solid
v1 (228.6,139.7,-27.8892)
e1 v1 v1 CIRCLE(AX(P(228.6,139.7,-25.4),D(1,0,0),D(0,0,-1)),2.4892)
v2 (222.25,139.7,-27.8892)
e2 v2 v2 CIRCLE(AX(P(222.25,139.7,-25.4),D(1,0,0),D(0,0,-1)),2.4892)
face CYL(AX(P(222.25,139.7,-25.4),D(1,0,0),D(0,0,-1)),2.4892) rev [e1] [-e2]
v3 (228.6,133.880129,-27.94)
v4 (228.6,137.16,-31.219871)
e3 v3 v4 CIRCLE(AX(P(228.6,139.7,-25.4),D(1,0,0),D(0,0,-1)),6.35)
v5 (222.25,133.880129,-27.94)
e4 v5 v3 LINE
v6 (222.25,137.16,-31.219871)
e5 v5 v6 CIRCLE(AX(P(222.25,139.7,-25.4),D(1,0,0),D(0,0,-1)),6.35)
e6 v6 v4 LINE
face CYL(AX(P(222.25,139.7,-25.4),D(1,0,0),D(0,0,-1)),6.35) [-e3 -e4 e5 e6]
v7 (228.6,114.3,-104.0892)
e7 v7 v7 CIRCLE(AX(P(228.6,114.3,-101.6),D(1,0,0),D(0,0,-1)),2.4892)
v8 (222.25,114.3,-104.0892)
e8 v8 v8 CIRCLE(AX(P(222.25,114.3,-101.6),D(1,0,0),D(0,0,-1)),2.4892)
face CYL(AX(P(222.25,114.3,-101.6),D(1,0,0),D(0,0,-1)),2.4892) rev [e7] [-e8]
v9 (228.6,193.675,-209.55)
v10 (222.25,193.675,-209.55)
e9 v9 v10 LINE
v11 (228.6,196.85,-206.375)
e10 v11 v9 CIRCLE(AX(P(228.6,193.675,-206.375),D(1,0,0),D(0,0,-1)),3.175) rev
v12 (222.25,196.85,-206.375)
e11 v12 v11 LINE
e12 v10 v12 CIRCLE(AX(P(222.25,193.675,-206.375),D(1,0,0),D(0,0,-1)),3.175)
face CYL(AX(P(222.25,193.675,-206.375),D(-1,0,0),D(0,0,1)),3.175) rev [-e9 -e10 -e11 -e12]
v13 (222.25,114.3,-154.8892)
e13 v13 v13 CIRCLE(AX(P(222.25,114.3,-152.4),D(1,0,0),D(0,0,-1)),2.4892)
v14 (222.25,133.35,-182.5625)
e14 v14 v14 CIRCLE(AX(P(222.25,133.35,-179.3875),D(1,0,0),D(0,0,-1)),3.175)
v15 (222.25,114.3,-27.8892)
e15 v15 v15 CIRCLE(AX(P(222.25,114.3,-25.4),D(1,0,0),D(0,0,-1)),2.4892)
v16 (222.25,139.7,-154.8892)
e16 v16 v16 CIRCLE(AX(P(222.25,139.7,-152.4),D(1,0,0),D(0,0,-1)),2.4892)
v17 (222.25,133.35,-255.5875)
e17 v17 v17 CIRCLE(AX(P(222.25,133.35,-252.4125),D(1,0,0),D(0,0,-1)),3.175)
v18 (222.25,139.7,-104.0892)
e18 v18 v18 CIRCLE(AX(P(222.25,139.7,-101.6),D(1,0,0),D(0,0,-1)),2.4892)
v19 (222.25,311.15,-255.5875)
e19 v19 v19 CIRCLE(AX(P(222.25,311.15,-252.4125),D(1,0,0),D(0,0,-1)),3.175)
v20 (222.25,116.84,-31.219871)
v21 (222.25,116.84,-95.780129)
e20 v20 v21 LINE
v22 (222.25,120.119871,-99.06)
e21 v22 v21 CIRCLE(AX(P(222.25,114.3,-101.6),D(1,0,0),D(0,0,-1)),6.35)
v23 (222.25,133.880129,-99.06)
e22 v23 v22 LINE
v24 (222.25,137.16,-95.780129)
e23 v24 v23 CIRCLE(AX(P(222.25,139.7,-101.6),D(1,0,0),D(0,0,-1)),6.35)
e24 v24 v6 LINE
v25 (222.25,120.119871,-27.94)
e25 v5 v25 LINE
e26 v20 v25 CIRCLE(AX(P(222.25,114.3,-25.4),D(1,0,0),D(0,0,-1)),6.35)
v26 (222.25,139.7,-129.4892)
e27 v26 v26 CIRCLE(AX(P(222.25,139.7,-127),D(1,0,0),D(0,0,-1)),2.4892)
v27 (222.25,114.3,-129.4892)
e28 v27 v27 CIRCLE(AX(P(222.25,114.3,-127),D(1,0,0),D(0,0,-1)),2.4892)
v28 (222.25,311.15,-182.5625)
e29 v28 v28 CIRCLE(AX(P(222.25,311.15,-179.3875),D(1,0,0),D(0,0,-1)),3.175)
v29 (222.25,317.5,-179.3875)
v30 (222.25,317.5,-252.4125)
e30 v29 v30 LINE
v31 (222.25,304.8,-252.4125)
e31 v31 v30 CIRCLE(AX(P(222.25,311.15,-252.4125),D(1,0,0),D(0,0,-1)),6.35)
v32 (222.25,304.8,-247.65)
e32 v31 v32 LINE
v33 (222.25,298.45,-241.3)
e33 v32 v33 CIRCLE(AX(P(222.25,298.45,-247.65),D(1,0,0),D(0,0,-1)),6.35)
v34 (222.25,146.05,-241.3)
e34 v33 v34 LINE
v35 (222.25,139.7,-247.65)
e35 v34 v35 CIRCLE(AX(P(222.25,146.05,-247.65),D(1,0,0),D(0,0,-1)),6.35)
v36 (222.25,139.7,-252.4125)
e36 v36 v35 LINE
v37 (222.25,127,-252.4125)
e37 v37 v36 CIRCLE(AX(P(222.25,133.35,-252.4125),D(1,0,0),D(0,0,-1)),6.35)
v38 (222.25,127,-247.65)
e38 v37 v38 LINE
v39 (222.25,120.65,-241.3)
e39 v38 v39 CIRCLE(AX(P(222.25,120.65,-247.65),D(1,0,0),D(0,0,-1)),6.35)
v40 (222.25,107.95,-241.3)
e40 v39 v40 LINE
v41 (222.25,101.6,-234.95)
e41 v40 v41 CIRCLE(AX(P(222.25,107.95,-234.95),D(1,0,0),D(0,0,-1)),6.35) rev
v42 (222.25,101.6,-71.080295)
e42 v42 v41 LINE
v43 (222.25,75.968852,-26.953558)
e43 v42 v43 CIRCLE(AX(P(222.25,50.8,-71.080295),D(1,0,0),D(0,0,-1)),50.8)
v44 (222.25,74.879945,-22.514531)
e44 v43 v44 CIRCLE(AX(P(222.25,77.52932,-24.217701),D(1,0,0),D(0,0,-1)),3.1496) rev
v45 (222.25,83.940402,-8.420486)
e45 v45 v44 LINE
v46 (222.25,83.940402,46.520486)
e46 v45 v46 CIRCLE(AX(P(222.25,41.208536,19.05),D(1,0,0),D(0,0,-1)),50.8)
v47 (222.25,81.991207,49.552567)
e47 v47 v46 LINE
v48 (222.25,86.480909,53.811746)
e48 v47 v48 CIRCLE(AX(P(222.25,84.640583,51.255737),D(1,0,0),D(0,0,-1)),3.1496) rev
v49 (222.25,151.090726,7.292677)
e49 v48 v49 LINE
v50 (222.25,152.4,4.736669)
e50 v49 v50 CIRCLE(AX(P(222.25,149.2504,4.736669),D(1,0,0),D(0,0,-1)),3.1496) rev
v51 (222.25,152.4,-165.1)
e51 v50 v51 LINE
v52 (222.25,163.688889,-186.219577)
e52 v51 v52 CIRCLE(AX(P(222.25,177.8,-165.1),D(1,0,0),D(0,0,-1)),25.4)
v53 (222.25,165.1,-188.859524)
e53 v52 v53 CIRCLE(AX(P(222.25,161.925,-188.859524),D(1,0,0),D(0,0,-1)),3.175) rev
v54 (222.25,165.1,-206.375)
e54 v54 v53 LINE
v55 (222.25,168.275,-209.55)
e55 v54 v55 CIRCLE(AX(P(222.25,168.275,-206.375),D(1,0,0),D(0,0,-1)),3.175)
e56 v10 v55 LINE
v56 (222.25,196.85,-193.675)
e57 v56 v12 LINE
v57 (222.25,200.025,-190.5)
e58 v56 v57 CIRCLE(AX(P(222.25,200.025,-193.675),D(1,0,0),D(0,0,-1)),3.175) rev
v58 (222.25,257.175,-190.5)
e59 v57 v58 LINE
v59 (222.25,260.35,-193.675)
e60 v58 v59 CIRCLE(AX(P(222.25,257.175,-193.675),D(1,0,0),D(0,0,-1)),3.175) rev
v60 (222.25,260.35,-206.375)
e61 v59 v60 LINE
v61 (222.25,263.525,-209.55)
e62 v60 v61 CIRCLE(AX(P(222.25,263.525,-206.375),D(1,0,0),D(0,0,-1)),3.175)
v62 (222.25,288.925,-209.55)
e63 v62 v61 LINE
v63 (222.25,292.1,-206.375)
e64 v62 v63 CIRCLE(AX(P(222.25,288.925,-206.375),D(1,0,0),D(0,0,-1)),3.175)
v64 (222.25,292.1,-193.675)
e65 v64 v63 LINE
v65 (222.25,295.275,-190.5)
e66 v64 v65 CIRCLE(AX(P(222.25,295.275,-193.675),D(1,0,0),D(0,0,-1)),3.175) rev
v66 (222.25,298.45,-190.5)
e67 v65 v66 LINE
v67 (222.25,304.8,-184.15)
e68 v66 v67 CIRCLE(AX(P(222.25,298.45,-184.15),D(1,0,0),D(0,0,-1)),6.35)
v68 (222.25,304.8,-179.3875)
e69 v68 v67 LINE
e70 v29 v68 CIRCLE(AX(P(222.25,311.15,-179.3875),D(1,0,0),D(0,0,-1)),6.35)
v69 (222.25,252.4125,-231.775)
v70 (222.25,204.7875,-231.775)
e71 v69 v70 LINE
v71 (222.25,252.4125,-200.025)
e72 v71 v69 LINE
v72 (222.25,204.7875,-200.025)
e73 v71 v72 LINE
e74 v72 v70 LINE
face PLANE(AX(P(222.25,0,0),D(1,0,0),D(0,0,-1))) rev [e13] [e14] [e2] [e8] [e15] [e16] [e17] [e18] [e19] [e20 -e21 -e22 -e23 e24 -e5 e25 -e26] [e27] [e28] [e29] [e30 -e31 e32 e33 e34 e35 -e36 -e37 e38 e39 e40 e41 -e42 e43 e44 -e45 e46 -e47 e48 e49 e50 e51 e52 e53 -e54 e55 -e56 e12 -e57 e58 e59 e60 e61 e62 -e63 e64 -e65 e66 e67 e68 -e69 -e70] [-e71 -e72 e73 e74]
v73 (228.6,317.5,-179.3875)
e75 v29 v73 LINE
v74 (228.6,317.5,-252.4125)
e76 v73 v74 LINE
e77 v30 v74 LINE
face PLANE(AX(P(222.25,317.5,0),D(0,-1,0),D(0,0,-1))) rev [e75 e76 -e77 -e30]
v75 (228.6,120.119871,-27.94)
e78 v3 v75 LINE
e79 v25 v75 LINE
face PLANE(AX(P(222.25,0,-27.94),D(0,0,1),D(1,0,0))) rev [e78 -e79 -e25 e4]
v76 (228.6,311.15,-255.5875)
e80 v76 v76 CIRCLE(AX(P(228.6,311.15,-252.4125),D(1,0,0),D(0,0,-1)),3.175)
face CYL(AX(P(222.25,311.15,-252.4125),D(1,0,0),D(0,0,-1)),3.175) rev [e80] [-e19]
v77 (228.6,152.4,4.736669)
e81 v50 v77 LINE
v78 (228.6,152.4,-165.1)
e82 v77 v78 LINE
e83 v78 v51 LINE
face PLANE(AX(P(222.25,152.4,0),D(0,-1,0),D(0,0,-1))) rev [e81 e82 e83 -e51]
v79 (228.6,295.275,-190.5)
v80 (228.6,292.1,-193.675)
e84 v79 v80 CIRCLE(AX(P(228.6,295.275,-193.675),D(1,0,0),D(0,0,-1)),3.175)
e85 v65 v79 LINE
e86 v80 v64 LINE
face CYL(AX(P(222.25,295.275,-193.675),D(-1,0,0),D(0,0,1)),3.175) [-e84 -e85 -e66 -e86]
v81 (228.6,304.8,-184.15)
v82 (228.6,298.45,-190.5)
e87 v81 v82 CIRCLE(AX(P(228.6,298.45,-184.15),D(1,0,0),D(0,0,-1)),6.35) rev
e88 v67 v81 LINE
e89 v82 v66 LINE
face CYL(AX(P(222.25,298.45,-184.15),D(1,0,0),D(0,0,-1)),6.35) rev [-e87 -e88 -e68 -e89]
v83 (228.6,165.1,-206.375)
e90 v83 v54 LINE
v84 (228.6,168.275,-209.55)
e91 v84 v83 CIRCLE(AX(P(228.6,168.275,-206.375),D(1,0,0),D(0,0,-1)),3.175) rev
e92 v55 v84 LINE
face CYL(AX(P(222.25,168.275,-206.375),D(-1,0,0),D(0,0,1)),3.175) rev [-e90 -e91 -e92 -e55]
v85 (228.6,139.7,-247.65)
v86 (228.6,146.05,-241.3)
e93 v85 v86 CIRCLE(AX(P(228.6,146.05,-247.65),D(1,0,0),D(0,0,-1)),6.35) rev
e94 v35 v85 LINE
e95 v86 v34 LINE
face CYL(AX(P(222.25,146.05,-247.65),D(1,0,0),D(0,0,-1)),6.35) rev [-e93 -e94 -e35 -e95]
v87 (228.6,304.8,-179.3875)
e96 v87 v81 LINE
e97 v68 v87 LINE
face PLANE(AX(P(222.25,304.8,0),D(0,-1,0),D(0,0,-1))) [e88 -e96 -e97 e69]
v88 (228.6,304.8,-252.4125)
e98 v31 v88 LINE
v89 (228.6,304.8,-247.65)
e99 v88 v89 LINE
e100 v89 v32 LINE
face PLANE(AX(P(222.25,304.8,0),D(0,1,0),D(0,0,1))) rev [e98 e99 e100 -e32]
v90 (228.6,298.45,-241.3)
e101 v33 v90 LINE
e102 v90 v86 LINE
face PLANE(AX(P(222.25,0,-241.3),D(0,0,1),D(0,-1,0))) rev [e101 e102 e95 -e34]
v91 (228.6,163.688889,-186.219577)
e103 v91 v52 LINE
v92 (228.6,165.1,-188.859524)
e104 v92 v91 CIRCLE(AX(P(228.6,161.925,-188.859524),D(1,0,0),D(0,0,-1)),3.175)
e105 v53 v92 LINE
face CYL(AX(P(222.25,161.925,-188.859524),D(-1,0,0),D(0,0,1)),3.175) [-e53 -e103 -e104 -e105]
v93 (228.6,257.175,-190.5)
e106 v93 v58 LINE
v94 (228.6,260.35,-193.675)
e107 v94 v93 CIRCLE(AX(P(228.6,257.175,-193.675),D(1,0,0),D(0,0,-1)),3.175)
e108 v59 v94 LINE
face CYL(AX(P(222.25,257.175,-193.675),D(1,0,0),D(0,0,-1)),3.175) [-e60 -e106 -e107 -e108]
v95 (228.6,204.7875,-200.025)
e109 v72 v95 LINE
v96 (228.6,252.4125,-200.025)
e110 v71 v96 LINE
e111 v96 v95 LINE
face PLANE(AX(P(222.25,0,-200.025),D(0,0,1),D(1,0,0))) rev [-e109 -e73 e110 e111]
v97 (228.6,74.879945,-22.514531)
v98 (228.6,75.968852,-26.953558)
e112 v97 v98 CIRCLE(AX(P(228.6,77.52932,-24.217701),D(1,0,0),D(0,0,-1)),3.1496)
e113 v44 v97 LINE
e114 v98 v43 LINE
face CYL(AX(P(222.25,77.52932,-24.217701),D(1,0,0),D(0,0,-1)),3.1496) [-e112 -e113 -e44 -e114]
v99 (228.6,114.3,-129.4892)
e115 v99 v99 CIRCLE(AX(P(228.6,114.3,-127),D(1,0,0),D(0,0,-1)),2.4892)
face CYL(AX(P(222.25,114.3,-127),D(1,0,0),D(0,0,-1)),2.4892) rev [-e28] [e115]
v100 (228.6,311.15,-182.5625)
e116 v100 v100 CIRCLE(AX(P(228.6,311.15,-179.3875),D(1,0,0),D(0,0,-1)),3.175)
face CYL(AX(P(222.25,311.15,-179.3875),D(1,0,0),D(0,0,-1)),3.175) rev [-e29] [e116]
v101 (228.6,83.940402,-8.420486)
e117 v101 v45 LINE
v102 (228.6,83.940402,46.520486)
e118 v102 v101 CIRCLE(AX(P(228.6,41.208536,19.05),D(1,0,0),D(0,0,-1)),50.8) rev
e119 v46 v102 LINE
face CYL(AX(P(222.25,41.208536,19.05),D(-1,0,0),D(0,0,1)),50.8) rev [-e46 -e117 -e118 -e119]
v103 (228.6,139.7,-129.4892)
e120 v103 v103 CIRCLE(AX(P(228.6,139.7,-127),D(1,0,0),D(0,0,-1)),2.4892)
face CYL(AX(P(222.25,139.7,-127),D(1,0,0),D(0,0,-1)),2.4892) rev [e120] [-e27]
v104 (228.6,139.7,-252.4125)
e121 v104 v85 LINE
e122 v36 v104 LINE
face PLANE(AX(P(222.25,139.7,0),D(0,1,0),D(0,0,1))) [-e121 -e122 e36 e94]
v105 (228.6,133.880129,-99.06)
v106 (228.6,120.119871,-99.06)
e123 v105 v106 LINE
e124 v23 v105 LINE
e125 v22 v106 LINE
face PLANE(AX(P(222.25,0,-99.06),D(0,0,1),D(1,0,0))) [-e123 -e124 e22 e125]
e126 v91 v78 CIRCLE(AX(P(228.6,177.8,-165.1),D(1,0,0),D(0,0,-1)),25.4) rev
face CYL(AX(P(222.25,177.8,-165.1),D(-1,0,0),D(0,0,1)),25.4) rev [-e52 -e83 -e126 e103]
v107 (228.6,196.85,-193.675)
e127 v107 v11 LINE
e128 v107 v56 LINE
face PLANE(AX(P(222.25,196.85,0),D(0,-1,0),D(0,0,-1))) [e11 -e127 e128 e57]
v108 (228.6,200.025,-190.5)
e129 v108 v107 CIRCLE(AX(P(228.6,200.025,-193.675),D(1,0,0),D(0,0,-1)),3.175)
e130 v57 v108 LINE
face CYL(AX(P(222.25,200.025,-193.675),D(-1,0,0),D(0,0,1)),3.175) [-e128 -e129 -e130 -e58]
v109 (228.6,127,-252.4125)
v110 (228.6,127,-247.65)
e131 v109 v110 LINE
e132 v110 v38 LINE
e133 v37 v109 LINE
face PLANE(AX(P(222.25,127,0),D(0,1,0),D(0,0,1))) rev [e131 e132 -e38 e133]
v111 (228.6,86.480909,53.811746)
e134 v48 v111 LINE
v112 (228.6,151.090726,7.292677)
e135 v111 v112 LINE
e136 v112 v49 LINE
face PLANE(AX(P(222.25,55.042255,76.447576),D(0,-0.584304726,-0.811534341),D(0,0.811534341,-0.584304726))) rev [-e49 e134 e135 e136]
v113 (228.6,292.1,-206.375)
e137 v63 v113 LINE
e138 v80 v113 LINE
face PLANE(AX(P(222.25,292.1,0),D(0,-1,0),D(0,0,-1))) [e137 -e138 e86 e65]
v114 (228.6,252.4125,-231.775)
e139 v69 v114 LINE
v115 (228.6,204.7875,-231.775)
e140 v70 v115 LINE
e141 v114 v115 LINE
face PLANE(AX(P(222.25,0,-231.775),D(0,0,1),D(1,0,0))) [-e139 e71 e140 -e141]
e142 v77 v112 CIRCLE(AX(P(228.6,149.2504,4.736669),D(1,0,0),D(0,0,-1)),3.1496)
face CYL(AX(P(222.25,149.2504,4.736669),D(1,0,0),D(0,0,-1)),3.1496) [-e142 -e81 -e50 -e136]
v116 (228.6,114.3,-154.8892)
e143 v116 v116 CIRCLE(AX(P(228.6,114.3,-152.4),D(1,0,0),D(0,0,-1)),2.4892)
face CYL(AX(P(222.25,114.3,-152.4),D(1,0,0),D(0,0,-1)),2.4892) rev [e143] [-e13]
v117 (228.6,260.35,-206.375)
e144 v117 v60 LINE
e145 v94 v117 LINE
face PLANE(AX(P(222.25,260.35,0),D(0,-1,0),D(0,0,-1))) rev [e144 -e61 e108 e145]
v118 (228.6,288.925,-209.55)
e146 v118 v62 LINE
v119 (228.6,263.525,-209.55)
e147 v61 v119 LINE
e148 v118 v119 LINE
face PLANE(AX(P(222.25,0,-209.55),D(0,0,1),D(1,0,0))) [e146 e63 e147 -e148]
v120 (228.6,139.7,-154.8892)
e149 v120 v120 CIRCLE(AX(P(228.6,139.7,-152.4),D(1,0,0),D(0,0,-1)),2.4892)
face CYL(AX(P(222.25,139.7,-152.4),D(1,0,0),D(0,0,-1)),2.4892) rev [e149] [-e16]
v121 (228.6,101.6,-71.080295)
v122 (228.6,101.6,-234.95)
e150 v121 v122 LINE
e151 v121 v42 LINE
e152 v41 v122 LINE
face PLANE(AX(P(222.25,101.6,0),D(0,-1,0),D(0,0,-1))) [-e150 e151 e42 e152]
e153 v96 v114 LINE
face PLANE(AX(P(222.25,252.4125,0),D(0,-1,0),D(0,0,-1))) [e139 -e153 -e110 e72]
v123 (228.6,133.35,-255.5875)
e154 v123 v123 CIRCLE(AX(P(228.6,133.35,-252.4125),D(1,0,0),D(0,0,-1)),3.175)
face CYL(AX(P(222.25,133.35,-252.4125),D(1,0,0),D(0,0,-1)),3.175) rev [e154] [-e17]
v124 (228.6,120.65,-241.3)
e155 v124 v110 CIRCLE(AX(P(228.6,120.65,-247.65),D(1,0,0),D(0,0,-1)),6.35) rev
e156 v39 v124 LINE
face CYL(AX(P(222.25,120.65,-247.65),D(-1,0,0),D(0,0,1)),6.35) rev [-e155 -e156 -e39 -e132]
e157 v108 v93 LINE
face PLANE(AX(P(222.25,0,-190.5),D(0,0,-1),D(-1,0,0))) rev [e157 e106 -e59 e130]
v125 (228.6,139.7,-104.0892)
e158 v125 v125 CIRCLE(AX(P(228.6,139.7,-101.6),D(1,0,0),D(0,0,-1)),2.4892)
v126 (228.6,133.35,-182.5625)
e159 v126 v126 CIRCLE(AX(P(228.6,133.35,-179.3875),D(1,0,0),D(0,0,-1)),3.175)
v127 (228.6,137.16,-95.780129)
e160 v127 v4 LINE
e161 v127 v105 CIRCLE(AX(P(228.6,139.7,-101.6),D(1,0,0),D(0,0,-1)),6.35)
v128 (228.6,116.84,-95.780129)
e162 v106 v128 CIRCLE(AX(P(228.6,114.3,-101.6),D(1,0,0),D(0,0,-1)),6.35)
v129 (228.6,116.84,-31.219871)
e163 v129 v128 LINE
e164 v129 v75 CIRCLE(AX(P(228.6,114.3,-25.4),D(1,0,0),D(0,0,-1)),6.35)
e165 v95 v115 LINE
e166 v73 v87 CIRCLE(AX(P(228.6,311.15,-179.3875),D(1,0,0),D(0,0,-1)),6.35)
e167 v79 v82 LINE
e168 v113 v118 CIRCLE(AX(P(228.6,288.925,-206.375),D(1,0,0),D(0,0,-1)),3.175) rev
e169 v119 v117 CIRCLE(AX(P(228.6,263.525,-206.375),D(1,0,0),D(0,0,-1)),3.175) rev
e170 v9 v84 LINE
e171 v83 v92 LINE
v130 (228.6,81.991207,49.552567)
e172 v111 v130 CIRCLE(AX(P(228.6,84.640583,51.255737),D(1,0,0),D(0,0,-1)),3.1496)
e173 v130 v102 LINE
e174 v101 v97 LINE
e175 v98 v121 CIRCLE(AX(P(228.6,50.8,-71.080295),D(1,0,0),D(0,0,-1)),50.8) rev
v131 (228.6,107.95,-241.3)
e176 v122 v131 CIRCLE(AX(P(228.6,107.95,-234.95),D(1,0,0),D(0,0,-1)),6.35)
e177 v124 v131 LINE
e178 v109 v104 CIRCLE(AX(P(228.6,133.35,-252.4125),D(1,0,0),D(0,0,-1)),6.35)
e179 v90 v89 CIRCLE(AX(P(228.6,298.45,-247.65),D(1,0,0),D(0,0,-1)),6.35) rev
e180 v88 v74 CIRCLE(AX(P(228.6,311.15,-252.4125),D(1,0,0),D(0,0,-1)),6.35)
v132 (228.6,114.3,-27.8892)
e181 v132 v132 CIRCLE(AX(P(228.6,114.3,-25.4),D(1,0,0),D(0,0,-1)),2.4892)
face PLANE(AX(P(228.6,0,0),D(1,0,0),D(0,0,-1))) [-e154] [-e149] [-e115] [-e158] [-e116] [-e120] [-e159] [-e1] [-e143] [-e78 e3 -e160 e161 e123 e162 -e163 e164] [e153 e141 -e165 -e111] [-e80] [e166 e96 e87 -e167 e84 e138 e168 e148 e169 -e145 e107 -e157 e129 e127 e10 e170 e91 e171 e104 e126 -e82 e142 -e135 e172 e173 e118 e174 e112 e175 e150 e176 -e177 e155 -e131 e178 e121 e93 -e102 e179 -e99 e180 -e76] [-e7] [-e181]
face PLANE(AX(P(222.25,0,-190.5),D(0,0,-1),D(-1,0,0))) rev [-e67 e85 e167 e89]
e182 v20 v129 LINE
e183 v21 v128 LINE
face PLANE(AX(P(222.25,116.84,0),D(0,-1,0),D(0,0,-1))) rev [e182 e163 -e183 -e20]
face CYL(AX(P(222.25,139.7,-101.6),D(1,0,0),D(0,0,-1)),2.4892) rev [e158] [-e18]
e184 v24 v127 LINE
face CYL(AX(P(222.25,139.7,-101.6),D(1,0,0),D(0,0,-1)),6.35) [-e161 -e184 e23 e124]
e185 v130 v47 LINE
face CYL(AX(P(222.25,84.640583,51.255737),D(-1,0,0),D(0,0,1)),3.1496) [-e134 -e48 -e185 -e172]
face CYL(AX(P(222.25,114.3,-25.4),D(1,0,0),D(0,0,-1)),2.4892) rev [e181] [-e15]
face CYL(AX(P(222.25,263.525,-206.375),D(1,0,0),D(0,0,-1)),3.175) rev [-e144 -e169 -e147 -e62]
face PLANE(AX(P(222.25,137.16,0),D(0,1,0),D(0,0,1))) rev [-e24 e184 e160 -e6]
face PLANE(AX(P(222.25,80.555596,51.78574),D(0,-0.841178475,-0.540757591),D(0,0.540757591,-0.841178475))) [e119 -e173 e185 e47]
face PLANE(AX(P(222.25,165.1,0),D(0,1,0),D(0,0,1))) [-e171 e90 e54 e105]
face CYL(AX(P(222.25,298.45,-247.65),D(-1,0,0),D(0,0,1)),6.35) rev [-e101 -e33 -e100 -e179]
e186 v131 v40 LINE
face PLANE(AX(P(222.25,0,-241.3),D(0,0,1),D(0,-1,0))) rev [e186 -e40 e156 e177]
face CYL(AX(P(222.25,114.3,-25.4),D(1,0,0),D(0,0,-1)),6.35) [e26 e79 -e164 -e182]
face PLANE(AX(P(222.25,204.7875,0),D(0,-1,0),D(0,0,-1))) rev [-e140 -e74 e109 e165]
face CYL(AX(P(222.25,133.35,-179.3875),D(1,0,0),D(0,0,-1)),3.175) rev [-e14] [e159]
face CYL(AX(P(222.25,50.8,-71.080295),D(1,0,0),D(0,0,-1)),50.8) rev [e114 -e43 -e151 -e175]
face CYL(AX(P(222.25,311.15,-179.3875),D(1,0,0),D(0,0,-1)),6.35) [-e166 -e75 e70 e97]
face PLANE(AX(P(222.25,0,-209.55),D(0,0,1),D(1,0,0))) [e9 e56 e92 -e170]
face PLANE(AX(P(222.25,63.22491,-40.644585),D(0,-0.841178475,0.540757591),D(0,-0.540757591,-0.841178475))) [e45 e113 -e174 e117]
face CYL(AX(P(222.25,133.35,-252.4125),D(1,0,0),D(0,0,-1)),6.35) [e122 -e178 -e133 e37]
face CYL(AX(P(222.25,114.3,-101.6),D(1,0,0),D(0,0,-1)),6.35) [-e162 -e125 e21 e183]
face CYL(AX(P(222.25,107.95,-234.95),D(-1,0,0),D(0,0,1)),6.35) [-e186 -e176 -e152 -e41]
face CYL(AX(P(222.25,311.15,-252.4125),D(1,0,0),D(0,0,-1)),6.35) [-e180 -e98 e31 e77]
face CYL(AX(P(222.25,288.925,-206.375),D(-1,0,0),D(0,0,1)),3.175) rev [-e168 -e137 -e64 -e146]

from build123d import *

# Parameters (mm, degrees)
SKETCH2_R           = 2.4892
SKETCH2_R_2         = 3.175
SKETCH2_R_3         = 6.35
BOSS_EXTRUDE1_DEPTH = 6.35
FILLET1_R           = 25.4
FILLET2_R           = 6.35
FILLET3_R           = 12.7
SKETCH3_W           = 19.05
SKETCH3_H           = 31.75
CUT_EXTRUDE1_DEPTH  = 410.639602463
FILLET4_R           = 3.175
BOSS_EXTRUDE2_START = -6.35
BOSS_EXTRUDE2_DEPTH = 6.35
FILLET5_R           = 50.8
FILLET6_R           = 3.1496
SKETCH5_W           = 31.75
SKETCH5_H           = 47.625
CUT_EXTRUDE2_DEPTH  = 410.639602463


with BuildPart() as part:
    # Sketch2 → Boss-Extrude1 (new body)
    # profile 1 of 8: a face of its own
    with BuildSketch(Plane(origin=(228.6, 0, 0), x_dir=(0, 0, -1), z_dir=(1, 0, 0))):
        Polygon((190.5, 152.4), (12.7, 152.4), (12.7, 101.6), (241.3, 101.6), (241.3, 127), (241.3, 139.7), (241.3, 152.4), align=None)
        with Locations((25.4, 114.3)):
            Circle(SKETCH2_R, mode=Mode.SUBTRACT)
        with Locations((25.4, 139.7)):
            Circle(SKETCH2_R, mode=Mode.SUBTRACT)
        with Locations((101.6, 114.3)):
            Circle(SKETCH2_R, mode=Mode.SUBTRACT)
        with Locations((127, 114.3)):
            Circle(SKETCH2_R, mode=Mode.SUBTRACT)
        with Locations((101.6, 139.7)):
            Circle(SKETCH2_R, mode=Mode.SUBTRACT)
        with Locations((127, 139.7)):
            Circle(SKETCH2_R, mode=Mode.SUBTRACT)
        with Locations((152.4, 114.3)):
            Circle(SKETCH2_R, mode=Mode.SUBTRACT)
        with Locations((152.4, 139.7)):
            Circle(SKETCH2_R, mode=Mode.SUBTRACT)
        with Locations((179.3875, 133.35)):
            Circle(SKETCH2_R_2, mode=Mode.SUBTRACT)
    # profile 2 of 8: a face of its own
    with BuildSketch(Plane(origin=(228.6, 0, 0), x_dir=(0, 0, -1), z_dir=(1, 0, 0))):
        Polygon((190.5, 304.8), (190.5, 152.4), (241.3, 152.4), (241.3, 304.8), (241.3, 317.5), (190.5, 317.5), align=None)
    # profile 3 of 8: a face of its own
    with BuildSketch(Plane(origin=(228.6, 0, 0), x_dir=(0, 0, -1), z_dir=(1, 0, 0))):
        with BuildLine():
            Line((179.3875, 304.8), (190.5, 304.8))
            Line((190.5, 304.8), (190.5, 317.5))
            Line((190.5, 317.5), (179.3875, 317.5))
            ThreePointArc((179.3875, 317.5), (183.877628061, 315.640128061), (185.7375, 311.15))
            ThreePointArc((185.7375, 311.15), (183.877628061, 306.659871939), (179.3875, 304.8))
        make_face()
    # profile 4 of 8: a face of its own
    with BuildSketch(Plane(origin=(228.6, 0, 0), x_dir=(0, 0, -1), z_dir=(1, 0, 0))):
        with Locations((179.3875, 311.15)):
            Circle(SKETCH2_R_3)
        with Locations((179.3875, 311.15)):
            Circle(SKETCH2_R_2, mode=Mode.SUBTRACT)
    # profile 5 of 8: a face of its own
    with BuildSketch(Plane(origin=(228.6, 0, 0), x_dir=(0, 0, -1), z_dir=(1, 0, 0))):
        with Locations((252.4125, 311.15)):
            Circle(SKETCH2_R_3)
        with Locations((252.4125, 311.15)):
            Circle(SKETCH2_R_2, mode=Mode.SUBTRACT)
    # profile 6 of 8: a face of its own
    with BuildSketch(Plane(origin=(228.6, 0, 0), x_dir=(0, 0, -1), z_dir=(1, 0, 0))):
        with BuildLine():
            Line((241.3, 317.5), (241.3, 304.8))
            Line((241.3, 304.8), (252.4125, 304.8))
            ThreePointArc((252.4125, 304.8), (246.0625, 311.15), (252.4125, 317.5))
            Line((252.4125, 317.5), (241.3, 317.5))
        make_face()
    # profile 7 of 8: a face of its own
    with BuildSketch(Plane(origin=(228.6, 0, 0), x_dir=(0, 0, -1), z_dir=(1, 0, 0))):
        with BuildLine():
            Line((252.4125, 139.7), (241.3, 139.7))
            Line((241.3, 139.7), (241.3, 127))
            Line((241.3, 127), (252.4125, 127))
            ThreePointArc((252.4125, 127), (246.0625, 133.35), (252.4125, 139.7))
        make_face()
    # profile 8 of 8: a face of its own
    with BuildSketch(Plane(origin=(228.6, 0, 0), x_dir=(0, 0, -1), z_dir=(1, 0, 0))):
        with Locations((252.4125, 133.35)):
            Circle(SKETCH2_R_3)
        with Locations((252.4125, 133.35)):
            Circle(SKETCH2_R_2, mode=Mode.SUBTRACT)
    extrude(amount=-BOSS_EXTRUDE1_DEPTH)

    # Fillet1
    fillet1_edges = [part.edges().sort_by_distance(p)[0] for p in [
        (225.425, 152.4, -190.5),
    ]]
    fillet(fillet1_edges, radius=FILLET1_R)

    # Fillet2
    fillet2_edges = [part.edges().sort_by_distance(p)[0] for p in [
        (225.425, 139.7, -241.3),
        (225.425, 127, -241.3),
        (225.425, 101.6, -241.3),
        (225.425, 304.8, -190.5),
        (225.425, 304.8, -241.3),
    ]]
    fillet(fillet2_edges, radius=FILLET2_R)

    # Fillet3
    fillet3_edges = [part.edges().sort_by_distance(p)[0] for p in [
        (225.425, 101.6, -12.7),
        (225.425, 152.4, -12.7),
    ]]
    fillet(fillet3_edges, radius=FILLET3_R)

    # Sketch3 → Cut-Extrude1 (cut, through all)
    with BuildSketch(Plane(origin=(228.6, 0, 0), x_dir=(0, 0, -1), z_dir=(1, 0, 0))):
        with BuildLine():
            Line((190.5, 177.8), (190.5, 190.18276047))
            Line((190.5, 190.18276047), (98.023677914, 190.18276047))
            Line((98.023677914, 190.18276047), (98.023677914, 165.1))
            Line((98.023677914, 165.1), (187.097045256, 165.1))
            ThreePointArc((187.097045256, 165.1), (189.634515988, 171.225996254), (190.5, 177.8))
        make_face()
        with Locations((200.025, 276.225)):
            Rectangle(SKETCH3_W, SKETCH3_H)
        with BuildLine():
            Line((190.5, 165.1), (190.5, 177.8))
            ThreePointArc((190.5, 177.8), (189.634515988, 171.225996254), (187.097045256, 165.1))
            Line((187.097045256, 165.1), (190.5, 165.1))
        make_face()
        Polygon((209.55, 196.85), (190.5, 196.85), (190.5, 190.18276047), (190.5, 177.8), (190.5, 165.1), (209.55, 165.1), align=None)
    extrude(amount=-CUT_EXTRUDE1_DEPTH, mode=Mode.SUBTRACT)

    # Fillet4
    fillet4_edges = [part.edges().sort_by_distance(p)[0] for p in [
        (225.425, 165.1, -187.097045256),
        (225.425, 292.1, -190.5),
        (225.425, 292.1, -209.55),
        (225.425, 260.35, -209.55),
        (225.425, 260.35, -190.5),
        (225.425, 165.1, -209.55),
        (225.425, 196.85, -190.5),
        (225.425, 196.85, -209.55),
    ]]
    fillet(fillet4_edges, radius=FILLET4_R)

    # Sketch4 → Boss-Extrude2 (add)
    with BuildSketch(Plane(origin=(228.6, 0, 0), x_dir=(0, 0, -1), z_dir=(1, 0, 0)).offset(BOSS_EXTRUDE2_START)):
        with BuildLine():
            Line((-6.35, 152.4), (-63.5, 73.025))
            Line((-63.5, 73.025), (-19.05, 101.6))
            Line((-19.05, 101.6), (25.4, 73.025))
            Line((25.4, 73.025), (25.4, 101.6))
            ThreePointArc((25.4, 101.6), (16.419743879, 105.319743879), (12.7, 114.3))
            Line((12.7, 114.3), (12.7, 139.7))
            ThreePointArc((12.7, 139.7), (16.419743879, 148.680256121), (25.4, 152.4))
            Line((25.4, 152.4), (-6.35, 152.4))
        make_face()
    extrude(amount=BOSS_EXTRUDE2_DEPTH)

    # Fillet5
    # the kernel refuses this fillet: 50.8 mm, written as the material it adds along each edge
    with BuildSketch(Plane(origin=(222.25, 101.6, 19.05), x_dir=(0, -0.5407575913134988, -0.8411784753765537), z_dir=(1, 0, 0))) as fillet5_piece_1:
        with BuildLine():
            CenterArc((FILLET5_R * 0.642857142857, -FILLET5_R), FILLET5_R, 90, 65.470452544)
            Line((-FILLET5_R * 0.266890149562, -FILLET5_R * 0.584837545126), (-FILLET5_R * 0.28508509541, -FILLET5_R * 0.576534296029))
            Line((-FILLET5_R * 0.28508509541, -FILLET5_R * 0.576534296029), (-FILLET5_R * 0.0128571428571, FILLET5_R * 0.02))
            Line((-FILLET5_R * 0.0128571428571, FILLET5_R * 0.02), (FILLET5_R * 0.642857142857, FILLET5_R * 0.02))
            Line((FILLET5_R * 0.642857142857, FILLET5_R * 0.02), (FILLET5_R * 0.642857142857, 0))
        make_face()
    extrude(amount=6.35)
    with BuildSketch(Plane(origin=(228.6, 101.6, -25.4), x_dir=(0, 0, -1), z_dir=(-1, 0, 0))) as fillet5_piece_2_section:
        with BuildLine():
            CenterArc((45.68029526, 50.8), FILLET5_R, 205.944479772, 64.055520228)
            Line((0, 28.575), (-0.913605905, 28.1305))
            ThreePointArc((-0.913605905, 28.1305), (-1.016, 14.2875), (-1.016, 0))
            Line((-1.016, 0), (0, -1.016))
            Line((0, -1.016), (45.68029526, -1.016))
            Line((45.68029526, -1.016), (45.68029526, 0))
        make_face()
    fillet5_piece_2 = extrude(amount=6.35, mode=Mode.PRIVATE)
    fillet5_piece_2 = split(fillet5_piece_2, bisect_by=Plane(origin=(225.425, 74.109510014, -23.712984423), z_dir=(0, 0.8411784753765535, -0.5407575913134988)), keep=Keep.TOP, mode=Mode.PRIVATE)
    add(fillet5_piece_2)

    # Fillet6
    fillet6_edges = [part.edges().sort_by_distance(p)[0] for p in [
        (225.425, 73.025, -25.4),
        (225.425, 73.025, 63.5),
        (225.425, 152.4, 6.35),
    ]]
    fillet(fillet6_edges, radius=FILLET6_R)

    # Sketch5 → Cut-Extrude2 (cut, through all)
    with BuildSketch(Plane(origin=(228.6, 0, 0), x_dir=(0, 0, -1), z_dir=(1, 0, 0))):
        with Locations((215.9, 228.6)):
            Rectangle(SKETCH5_W, SKETCH5_H)
        with BuildLine():
            ThreePointArc((99.06, 133.880128867), (97.109871939, 135.209871939), (95.780128867, 137.16))
            Line((95.780128867, 137.16), (31.219871133, 137.16))
            ThreePointArc((31.219871133, 137.16), (29.890128061, 135.209871939), (27.94, 133.880128867))
            Line((27.94, 133.880128867), (27.94, 120.119871133))
            ThreePointArc((27.94, 120.119871133), (29.890128061, 118.790128061), (31.219871133, 116.84))
            Line((31.219871133, 116.84), (95.780128867, 116.84))
            ThreePointArc((95.780128867, 116.84), (97.109871939, 118.790128061), (99.06, 120.119871133))
            Line((99.06, 120.119871133), (99.06, 133.880128867))
        make_face()
    extrude(amount=-CUT_EXTRUDE2_DEPTH, mode=Mode.SUBTRACT)


solid = part.part
